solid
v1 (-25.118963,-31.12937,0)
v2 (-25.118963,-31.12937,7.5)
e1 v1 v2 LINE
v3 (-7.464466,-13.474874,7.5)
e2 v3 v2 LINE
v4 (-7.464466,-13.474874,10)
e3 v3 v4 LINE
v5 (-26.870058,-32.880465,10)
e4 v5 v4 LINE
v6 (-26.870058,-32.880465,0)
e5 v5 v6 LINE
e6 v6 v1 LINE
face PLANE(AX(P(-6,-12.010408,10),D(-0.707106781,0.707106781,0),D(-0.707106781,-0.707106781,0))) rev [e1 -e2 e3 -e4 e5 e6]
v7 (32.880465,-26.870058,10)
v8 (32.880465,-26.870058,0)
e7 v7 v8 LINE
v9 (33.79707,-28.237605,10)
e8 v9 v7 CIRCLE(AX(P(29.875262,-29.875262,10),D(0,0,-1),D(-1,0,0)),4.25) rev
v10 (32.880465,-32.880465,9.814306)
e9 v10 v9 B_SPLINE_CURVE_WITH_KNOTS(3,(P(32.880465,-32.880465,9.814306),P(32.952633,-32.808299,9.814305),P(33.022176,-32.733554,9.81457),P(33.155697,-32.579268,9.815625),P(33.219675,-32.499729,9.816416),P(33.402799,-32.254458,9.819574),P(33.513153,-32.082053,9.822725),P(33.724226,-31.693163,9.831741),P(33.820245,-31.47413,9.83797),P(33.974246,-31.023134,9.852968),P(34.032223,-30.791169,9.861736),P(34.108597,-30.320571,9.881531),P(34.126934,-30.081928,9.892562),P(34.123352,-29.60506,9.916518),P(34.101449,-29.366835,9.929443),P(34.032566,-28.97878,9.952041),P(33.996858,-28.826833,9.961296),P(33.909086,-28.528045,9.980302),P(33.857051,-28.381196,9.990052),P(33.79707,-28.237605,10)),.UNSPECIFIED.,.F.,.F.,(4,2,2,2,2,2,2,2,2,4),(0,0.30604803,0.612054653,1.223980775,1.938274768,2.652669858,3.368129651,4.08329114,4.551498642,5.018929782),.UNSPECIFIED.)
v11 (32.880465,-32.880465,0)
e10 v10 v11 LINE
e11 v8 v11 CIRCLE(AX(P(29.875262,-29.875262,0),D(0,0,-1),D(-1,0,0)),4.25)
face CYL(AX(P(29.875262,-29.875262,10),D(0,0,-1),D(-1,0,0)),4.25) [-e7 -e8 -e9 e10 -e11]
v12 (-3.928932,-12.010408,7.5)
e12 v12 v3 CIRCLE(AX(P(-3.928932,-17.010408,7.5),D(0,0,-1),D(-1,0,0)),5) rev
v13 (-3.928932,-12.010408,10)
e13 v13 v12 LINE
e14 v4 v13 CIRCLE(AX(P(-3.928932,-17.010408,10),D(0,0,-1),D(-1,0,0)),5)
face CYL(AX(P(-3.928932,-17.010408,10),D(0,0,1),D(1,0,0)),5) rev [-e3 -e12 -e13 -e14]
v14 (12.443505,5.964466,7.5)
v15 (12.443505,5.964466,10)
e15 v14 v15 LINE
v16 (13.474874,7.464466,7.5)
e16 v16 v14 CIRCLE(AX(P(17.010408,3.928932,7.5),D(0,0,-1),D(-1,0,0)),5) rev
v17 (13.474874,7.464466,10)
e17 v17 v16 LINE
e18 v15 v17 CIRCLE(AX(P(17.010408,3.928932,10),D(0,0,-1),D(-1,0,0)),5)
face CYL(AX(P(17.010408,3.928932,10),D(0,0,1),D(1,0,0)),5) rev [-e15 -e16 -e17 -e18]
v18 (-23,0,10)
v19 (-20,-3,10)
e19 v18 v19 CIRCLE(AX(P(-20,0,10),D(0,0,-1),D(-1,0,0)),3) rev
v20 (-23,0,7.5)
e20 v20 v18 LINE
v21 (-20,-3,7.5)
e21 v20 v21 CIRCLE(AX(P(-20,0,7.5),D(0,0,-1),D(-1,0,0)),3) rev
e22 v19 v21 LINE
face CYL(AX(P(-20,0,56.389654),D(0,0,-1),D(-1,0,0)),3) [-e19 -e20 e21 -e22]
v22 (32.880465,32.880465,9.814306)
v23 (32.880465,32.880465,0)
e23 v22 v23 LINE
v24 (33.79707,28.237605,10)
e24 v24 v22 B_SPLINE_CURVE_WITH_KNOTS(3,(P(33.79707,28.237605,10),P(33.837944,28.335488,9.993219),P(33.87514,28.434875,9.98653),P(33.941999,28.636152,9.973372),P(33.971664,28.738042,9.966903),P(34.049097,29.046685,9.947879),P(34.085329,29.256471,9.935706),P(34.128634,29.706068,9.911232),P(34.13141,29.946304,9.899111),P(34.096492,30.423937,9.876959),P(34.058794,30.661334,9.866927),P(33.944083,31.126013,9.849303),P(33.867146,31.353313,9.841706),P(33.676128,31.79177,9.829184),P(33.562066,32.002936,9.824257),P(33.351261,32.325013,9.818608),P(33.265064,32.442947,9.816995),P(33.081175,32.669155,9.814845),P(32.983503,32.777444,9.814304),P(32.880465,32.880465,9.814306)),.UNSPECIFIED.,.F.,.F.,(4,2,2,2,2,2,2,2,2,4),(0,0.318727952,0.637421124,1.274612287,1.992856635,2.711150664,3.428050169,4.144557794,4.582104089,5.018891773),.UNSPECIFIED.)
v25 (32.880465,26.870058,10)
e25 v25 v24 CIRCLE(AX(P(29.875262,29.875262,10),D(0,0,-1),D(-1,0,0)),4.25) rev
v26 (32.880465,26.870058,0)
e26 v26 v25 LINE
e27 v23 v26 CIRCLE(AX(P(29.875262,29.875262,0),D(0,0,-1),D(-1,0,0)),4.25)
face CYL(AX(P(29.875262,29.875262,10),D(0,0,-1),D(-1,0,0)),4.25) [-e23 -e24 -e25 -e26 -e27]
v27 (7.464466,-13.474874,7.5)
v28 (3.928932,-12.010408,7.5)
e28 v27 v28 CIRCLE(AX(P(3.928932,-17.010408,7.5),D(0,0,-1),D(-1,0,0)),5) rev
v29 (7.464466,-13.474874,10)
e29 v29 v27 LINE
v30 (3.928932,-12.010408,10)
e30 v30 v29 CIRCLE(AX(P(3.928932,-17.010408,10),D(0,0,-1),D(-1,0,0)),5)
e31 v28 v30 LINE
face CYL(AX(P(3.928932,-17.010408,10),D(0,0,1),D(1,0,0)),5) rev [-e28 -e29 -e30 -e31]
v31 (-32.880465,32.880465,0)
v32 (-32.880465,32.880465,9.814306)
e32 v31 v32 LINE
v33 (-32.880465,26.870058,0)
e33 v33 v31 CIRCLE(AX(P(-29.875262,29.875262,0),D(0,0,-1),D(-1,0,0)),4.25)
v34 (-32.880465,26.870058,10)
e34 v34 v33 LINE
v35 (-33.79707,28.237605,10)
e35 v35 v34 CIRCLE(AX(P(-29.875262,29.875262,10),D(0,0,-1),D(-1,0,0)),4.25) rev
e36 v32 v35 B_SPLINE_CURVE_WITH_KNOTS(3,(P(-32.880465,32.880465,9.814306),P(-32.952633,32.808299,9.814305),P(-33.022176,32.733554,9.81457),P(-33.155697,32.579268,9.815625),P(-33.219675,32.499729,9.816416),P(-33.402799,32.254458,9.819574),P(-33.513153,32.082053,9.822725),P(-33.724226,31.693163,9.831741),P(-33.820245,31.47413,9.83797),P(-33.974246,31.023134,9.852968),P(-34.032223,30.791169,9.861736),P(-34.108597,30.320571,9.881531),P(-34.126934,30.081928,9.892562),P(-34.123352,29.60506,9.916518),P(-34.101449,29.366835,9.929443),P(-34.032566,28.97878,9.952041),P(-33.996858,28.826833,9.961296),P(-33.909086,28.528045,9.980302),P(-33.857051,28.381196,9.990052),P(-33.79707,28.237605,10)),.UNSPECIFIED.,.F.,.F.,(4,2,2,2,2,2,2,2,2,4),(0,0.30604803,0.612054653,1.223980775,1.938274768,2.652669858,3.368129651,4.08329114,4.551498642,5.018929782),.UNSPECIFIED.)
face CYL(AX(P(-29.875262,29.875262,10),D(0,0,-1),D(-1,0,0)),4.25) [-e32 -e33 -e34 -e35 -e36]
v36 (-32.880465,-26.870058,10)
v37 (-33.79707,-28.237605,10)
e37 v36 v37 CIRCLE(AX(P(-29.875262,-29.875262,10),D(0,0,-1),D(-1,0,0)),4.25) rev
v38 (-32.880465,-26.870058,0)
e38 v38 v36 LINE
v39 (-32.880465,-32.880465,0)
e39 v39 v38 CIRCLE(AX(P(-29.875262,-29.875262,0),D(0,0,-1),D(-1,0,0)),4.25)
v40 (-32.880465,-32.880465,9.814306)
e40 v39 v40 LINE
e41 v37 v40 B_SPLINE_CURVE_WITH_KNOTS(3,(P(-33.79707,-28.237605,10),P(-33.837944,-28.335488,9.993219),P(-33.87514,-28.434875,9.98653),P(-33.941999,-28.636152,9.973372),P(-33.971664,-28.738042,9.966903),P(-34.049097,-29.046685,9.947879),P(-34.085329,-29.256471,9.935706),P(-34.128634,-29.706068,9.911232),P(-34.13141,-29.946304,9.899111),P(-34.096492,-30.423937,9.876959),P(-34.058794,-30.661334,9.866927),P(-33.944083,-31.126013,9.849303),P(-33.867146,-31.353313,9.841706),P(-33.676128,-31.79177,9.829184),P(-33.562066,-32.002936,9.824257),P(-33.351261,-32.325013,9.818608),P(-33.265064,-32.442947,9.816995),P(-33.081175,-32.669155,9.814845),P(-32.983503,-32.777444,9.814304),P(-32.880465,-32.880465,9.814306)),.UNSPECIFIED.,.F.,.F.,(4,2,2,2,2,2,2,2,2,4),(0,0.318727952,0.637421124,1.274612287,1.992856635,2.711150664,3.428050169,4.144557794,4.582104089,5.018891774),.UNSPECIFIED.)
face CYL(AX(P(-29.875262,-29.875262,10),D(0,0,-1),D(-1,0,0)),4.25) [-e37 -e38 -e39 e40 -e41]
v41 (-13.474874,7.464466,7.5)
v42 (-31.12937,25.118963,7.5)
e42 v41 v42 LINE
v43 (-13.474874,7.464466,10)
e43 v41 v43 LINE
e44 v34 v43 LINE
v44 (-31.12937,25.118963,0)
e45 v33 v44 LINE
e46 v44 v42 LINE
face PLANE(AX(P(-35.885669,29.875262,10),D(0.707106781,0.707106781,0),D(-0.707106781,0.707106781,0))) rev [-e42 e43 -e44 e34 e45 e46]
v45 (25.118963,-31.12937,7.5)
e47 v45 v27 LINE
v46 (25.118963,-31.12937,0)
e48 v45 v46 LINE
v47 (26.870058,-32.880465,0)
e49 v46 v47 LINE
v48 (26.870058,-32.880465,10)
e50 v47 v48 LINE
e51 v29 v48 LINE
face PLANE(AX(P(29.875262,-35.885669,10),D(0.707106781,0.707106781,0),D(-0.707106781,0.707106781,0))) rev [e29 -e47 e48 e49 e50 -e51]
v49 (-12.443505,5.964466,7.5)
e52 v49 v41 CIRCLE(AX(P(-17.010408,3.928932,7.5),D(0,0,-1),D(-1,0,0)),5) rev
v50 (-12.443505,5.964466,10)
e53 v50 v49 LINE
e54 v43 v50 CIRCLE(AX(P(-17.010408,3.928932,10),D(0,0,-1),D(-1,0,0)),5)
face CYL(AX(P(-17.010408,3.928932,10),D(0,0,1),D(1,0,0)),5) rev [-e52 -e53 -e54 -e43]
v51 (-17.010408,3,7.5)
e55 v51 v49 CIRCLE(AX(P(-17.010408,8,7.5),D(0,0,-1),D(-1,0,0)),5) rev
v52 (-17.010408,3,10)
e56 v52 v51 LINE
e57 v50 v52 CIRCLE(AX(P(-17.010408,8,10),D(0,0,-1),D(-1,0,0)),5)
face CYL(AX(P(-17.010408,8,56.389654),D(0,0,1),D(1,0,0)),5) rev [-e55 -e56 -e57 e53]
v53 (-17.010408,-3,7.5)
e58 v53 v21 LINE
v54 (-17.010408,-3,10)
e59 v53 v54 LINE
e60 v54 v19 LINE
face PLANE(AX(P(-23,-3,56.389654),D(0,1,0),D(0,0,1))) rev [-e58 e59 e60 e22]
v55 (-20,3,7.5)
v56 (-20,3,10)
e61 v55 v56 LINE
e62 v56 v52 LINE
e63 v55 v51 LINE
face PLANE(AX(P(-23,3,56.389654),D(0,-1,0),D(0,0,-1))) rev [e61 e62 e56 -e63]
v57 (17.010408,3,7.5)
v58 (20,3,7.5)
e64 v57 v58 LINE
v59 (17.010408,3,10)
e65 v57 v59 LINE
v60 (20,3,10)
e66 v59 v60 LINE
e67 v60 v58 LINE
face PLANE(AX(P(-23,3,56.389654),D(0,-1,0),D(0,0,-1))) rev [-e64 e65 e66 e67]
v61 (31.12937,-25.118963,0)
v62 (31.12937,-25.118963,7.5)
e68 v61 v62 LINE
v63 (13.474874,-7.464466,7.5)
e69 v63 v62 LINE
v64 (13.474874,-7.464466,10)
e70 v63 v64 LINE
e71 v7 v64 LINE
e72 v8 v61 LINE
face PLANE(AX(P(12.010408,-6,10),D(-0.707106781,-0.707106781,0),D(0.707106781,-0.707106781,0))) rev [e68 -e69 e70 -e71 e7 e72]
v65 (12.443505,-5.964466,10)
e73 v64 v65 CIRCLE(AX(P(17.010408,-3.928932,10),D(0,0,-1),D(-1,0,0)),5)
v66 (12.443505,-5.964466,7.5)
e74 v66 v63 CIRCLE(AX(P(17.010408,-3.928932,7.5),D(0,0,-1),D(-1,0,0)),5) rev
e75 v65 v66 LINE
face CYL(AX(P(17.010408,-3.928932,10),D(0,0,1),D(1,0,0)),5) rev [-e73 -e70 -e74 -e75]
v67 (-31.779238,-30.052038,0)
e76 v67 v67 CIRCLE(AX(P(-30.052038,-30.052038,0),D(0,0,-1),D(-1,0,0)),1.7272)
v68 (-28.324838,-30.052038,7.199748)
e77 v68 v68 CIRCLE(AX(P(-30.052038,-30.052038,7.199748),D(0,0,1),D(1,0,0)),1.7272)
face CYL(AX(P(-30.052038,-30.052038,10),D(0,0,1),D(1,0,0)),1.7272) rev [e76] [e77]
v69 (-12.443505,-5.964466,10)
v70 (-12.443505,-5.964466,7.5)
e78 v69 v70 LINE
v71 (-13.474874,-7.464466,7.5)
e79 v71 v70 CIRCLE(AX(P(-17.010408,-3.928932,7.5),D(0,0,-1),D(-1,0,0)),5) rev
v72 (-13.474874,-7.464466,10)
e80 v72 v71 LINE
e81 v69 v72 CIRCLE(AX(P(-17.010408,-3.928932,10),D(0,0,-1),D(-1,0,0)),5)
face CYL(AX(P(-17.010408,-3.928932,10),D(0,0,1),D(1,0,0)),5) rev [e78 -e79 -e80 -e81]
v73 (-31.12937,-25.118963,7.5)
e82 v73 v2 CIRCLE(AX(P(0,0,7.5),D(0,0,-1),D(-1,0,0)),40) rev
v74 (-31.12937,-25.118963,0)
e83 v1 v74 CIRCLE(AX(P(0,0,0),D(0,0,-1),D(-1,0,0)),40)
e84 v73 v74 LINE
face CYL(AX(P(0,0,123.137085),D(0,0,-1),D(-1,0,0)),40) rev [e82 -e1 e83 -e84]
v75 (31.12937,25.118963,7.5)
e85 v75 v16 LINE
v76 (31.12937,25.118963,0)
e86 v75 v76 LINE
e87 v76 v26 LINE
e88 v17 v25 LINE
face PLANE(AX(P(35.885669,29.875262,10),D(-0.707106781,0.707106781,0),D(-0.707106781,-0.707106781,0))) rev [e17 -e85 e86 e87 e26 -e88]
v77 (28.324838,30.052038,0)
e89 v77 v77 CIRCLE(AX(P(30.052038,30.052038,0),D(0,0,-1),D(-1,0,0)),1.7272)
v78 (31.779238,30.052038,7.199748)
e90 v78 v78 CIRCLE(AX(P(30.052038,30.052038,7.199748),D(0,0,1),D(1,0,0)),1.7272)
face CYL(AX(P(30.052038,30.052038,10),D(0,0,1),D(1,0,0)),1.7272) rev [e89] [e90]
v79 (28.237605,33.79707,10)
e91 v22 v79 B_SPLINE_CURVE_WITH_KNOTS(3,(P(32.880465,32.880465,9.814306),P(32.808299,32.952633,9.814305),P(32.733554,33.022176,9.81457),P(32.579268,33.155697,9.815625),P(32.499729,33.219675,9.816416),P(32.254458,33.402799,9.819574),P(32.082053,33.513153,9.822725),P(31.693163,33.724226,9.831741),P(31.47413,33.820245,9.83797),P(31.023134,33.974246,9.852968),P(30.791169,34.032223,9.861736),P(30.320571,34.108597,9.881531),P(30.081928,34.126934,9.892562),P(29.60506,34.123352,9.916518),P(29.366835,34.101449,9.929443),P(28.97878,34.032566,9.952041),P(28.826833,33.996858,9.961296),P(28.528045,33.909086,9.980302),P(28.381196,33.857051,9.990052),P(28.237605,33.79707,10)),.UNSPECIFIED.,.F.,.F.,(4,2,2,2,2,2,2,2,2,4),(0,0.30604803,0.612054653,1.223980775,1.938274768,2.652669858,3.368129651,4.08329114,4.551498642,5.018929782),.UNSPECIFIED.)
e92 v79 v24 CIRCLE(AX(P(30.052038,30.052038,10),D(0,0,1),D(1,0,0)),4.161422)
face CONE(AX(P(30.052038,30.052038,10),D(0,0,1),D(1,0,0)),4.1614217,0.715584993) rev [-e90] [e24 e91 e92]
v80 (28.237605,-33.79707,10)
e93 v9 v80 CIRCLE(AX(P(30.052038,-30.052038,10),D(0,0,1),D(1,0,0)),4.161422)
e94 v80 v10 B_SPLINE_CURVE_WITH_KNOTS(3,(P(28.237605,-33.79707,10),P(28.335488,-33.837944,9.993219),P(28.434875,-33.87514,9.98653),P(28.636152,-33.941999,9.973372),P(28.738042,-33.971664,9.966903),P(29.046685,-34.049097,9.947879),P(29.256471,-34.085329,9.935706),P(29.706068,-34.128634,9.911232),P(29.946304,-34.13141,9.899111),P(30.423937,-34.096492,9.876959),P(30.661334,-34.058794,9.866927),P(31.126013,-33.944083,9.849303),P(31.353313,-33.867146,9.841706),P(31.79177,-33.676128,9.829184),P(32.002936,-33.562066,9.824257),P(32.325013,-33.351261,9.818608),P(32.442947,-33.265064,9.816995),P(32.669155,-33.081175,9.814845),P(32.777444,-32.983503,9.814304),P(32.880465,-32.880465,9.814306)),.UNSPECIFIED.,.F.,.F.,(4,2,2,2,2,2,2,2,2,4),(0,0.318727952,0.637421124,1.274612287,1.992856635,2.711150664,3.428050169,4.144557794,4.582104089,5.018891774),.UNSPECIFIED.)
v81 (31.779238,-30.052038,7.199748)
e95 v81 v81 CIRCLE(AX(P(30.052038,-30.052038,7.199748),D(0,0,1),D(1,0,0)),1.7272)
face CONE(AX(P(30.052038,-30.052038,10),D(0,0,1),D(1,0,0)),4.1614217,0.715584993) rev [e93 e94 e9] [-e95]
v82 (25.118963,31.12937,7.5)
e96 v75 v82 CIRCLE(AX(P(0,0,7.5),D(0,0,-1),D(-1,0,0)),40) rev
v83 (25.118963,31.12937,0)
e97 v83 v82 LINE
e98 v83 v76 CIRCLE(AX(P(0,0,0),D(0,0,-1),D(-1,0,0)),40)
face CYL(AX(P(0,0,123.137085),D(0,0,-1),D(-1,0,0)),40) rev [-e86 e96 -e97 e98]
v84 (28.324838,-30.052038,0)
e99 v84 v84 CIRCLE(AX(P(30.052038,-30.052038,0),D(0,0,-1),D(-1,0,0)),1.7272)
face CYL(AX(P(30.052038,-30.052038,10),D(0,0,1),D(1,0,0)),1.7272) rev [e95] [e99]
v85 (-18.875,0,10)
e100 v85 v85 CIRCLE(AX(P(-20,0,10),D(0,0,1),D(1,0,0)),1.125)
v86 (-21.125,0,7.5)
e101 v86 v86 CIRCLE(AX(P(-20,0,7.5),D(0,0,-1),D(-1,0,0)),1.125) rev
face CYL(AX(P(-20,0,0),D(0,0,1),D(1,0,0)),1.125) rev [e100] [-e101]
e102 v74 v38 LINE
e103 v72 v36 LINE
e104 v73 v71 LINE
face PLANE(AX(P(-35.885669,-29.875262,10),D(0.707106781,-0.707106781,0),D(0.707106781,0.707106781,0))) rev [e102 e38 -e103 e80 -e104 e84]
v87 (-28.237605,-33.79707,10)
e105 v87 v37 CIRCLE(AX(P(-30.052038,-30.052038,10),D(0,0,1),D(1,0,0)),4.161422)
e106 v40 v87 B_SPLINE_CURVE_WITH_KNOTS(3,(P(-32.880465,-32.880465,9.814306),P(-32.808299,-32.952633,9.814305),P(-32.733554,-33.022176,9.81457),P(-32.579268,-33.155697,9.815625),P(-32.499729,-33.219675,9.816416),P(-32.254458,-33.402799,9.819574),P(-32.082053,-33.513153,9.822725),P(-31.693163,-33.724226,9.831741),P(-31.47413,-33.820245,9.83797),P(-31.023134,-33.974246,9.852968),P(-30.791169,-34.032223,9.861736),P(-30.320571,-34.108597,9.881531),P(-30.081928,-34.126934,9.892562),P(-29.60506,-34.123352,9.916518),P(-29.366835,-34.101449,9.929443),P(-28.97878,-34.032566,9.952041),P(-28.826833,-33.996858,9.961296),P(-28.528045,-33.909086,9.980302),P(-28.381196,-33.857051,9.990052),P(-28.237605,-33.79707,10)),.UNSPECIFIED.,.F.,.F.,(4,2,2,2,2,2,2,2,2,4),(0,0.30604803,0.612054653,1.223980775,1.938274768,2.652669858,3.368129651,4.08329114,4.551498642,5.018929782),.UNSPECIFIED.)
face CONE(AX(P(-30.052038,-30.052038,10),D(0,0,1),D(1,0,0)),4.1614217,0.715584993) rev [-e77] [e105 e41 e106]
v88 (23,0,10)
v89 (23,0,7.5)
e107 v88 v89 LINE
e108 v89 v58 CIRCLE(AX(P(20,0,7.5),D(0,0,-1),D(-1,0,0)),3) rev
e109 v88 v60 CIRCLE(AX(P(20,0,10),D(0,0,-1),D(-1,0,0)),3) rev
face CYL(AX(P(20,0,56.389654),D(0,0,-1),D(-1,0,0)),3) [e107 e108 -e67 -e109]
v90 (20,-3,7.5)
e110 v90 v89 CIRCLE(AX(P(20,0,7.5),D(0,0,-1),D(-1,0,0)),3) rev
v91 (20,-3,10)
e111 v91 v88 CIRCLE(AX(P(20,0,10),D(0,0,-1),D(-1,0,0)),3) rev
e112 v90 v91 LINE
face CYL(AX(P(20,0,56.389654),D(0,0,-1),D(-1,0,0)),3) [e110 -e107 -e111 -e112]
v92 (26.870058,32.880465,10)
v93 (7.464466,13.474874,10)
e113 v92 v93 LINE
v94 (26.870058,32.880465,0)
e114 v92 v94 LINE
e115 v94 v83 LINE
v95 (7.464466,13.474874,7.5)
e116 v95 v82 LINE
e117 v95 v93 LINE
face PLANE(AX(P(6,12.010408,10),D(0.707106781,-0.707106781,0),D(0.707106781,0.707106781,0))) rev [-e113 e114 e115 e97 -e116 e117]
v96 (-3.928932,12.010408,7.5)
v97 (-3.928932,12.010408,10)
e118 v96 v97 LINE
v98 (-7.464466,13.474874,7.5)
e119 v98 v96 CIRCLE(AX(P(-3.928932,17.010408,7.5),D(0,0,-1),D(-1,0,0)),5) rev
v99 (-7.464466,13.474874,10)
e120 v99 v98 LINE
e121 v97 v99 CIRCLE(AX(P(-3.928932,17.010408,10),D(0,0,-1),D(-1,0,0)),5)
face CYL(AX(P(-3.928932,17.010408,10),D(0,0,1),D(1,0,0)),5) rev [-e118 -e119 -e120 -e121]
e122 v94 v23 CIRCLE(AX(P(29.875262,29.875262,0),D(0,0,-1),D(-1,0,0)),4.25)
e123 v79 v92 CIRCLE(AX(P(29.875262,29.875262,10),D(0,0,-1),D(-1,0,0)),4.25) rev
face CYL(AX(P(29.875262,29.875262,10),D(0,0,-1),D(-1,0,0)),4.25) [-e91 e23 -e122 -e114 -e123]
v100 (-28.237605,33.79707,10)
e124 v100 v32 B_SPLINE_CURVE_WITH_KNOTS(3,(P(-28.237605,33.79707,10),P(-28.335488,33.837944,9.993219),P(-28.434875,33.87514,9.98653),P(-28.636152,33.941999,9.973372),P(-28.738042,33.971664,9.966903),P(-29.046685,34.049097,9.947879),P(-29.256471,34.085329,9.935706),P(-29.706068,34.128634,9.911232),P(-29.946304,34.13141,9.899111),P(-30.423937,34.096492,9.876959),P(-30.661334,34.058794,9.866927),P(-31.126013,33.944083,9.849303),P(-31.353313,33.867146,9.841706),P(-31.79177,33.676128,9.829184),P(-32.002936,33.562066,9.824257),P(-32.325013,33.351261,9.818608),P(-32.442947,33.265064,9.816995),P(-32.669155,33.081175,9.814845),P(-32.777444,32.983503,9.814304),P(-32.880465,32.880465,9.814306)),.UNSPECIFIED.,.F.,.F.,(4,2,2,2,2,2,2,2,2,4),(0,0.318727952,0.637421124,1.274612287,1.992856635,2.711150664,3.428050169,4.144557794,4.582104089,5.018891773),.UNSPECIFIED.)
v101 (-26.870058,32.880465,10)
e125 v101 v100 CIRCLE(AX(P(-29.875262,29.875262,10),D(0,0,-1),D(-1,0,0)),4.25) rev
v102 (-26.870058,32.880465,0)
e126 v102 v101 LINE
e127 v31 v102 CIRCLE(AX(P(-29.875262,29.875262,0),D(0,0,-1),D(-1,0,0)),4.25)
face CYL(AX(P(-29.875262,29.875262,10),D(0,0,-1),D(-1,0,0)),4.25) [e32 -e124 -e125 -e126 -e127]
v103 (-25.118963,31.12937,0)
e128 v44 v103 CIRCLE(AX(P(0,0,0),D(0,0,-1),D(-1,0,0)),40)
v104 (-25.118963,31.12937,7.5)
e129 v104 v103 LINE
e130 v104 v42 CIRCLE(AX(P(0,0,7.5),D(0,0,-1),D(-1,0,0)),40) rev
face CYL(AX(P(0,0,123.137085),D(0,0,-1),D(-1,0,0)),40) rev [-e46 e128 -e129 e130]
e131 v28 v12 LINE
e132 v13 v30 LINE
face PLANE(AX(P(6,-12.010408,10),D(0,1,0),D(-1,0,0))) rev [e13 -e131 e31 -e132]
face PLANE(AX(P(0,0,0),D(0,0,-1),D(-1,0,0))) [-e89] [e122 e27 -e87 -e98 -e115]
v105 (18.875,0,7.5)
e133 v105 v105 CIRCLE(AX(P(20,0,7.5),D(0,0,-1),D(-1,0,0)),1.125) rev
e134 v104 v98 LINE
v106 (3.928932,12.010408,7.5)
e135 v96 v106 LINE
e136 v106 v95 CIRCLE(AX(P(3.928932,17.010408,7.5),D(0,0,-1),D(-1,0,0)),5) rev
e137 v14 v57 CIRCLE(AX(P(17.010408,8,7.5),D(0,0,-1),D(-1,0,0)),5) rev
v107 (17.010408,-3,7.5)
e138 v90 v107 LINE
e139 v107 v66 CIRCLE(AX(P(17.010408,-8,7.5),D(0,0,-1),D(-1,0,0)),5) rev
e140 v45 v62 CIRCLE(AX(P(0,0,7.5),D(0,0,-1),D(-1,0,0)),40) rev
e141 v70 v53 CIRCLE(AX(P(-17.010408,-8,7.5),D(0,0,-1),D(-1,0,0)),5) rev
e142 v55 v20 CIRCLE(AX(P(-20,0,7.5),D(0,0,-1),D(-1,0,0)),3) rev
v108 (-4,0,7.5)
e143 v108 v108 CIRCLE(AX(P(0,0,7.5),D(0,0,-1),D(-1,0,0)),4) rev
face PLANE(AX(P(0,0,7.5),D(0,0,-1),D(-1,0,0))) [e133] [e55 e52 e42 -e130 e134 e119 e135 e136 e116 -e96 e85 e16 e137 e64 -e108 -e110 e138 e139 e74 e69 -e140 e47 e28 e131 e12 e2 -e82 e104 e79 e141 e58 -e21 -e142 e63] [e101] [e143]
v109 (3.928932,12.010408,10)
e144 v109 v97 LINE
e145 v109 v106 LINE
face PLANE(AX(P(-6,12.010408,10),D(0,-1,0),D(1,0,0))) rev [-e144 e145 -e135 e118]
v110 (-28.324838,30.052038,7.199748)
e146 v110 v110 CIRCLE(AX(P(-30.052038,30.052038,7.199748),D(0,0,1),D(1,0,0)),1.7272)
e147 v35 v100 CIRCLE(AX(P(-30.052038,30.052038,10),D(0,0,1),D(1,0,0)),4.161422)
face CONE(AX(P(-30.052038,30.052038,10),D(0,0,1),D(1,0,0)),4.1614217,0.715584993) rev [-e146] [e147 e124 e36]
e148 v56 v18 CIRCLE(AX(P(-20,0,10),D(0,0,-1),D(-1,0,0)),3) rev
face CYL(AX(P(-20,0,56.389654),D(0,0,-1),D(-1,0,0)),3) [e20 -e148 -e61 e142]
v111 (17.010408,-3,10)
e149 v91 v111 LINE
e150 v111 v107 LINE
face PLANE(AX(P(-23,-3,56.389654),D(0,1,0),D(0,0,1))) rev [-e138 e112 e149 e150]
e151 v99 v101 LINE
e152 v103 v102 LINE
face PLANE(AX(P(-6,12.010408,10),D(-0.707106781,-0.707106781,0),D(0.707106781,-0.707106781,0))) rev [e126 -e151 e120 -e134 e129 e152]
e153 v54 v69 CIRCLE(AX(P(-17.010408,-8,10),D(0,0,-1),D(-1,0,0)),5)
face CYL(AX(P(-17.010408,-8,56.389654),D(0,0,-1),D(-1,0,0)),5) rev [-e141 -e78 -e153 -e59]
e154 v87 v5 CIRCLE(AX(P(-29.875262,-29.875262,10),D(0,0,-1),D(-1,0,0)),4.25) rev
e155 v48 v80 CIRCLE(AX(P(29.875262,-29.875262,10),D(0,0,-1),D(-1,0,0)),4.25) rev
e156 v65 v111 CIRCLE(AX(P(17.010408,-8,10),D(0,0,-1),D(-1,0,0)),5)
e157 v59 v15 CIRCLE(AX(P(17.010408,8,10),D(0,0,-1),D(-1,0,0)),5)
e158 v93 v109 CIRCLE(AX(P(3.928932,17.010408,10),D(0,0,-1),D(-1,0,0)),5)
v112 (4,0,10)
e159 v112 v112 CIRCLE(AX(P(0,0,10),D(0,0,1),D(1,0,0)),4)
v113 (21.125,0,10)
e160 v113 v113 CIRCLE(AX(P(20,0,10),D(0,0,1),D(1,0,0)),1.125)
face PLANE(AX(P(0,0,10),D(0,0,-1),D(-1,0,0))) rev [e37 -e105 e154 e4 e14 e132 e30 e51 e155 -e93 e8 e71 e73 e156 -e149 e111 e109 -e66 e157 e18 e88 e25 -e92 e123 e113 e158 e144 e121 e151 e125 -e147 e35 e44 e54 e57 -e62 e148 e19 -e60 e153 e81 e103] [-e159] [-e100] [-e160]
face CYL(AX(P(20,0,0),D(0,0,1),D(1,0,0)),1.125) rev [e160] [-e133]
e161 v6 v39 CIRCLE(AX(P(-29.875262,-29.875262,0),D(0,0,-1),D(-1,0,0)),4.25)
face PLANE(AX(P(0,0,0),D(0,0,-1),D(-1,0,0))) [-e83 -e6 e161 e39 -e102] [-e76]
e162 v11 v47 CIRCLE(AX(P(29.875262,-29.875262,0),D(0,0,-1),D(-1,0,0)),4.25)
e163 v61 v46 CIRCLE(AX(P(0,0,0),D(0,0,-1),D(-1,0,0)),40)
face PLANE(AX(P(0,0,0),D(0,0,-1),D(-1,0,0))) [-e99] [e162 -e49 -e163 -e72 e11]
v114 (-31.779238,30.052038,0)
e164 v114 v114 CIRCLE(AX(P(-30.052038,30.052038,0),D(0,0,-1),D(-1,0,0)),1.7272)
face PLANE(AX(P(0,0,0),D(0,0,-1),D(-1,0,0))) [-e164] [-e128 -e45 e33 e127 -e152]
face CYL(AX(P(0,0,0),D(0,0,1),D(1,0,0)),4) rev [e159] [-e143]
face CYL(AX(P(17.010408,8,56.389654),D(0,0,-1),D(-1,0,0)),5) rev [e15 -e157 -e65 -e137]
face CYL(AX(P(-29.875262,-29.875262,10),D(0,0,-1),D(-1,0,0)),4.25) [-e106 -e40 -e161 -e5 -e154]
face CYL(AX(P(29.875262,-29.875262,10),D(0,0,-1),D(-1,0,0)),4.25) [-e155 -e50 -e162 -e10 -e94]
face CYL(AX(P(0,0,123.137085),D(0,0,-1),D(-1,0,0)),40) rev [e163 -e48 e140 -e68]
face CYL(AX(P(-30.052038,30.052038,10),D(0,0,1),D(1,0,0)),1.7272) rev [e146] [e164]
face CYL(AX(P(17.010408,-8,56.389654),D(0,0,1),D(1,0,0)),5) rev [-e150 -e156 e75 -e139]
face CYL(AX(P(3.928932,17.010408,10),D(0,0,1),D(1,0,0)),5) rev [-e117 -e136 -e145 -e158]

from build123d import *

# Parameters (mm, degrees)
BOSS_EXTRUDE1_DEPTH                            = 10
SKETCH3_W                                      = 46
SKETCH3_H                                      = 6
BOSS_EXTRUDE2_DEPTH                            = 10
CSK_FOR_4_OVAL_HEAD_MACHINE_SCREW1_D           = 3.4544
CSK_FOR_4_OVAL_HEAD_MACHINE_SCREW1_DEPTH       = 25
CSK_FOR_4_OVAL_HEAD_MACHINE_SCREW1_CSINK_D     = 8.3228434
CSK_FOR_4_OVAL_HEAD_MACHINE_SCREW1_CSINK_ANGLE = 82
CSK_FOR_4_OVAL_HEAD_MACHINE_SCREW1_TIP         = 1.037806461
SKETCH7_R                                      = 1.125
CUT_EXTRUDE1_DEPTH                             = 52.725839771
SKETCH8_R                                      = 4
CUT_EXTRUDE2_DEPTH                             = 52.725839771
FILLET1_R                                      = 4.25
FILLET2_R                                      = 3
FILLET3_R                                      = 5
SKETCH9_R                                      = 40
CUT_EXTRUDE3_DEPTH                             = 7.5


# Some blends are built 0.0001 mm under size
with BuildPart() as part:
    # Sketch2 → Boss-Extrude1 (new body)
    with BuildSketch(Plane.XY):
        Polygon((-6, 12.01040764), (-29.875261505, 35.885669145), (-35.885669145, 29.875261505), (-12.01040764, 6), (-12.01040764, -6), (-35.885669145, -29.875261505), (-29.875261505, -35.885669145), (-6, -12.01040764), (6, -12.01040764), (29.875261505, -35.885669145), (35.885669145, -29.875261505), (12.01040764, -6), (12.01040764, 6), (35.885669145, 29.875261505), (29.875261505, 35.885669145), (6, 12.01040764), align=None)
    extrude(amount=BOSS_EXTRUDE1_DEPTH)

    # Sketch3 → Boss-Extrude2 (add)
    with BuildSketch(Plane.XY):
        Rectangle(SKETCH3_W, SKETCH3_H)
    extrude(amount=BOSS_EXTRUDE2_DEPTH)

    # CSK for #4 Oval Head Machine Screw1
    with Locations(Plane.XY.offset(10)):
        with Locations((-30.0520382, 30.0520382), (30.0520382, 30.0520382), (30.0520382, -30.0520382), (-30.0520382, -30.0520382)):
            CounterSinkHole(CSK_FOR_4_OVAL_HEAD_MACHINE_SCREW1_D / 2, CSK_FOR_4_OVAL_HEAD_MACHINE_SCREW1_CSINK_D / 2, depth=CSK_FOR_4_OVAL_HEAD_MACHINE_SCREW1_DEPTH, counter_sink_angle=CSK_FOR_4_OVAL_HEAD_MACHINE_SCREW1_CSINK_ANGLE)
            with Locations((0, 0, -(CSK_FOR_4_OVAL_HEAD_MACHINE_SCREW1_DEPTH + CSK_FOR_4_OVAL_HEAD_MACHINE_SCREW1_TIP / 2))):  # 118° drill point
                Cone(0, CSK_FOR_4_OVAL_HEAD_MACHINE_SCREW1_D / 2, CSK_FOR_4_OVAL_HEAD_MACHINE_SCREW1_TIP, mode=Mode.SUBTRACT)

    # Sketch7 → Cut-Extrude1 (cut, through all)
    with BuildSketch(Plane.XY.offset(10)):
        with Locations((20, 0)):
            Circle(SKETCH7_R)
        with Locations((-20, 0)):
            Circle(SKETCH7_R)
    extrude(amount=-CUT_EXTRUDE1_DEPTH, mode=Mode.SUBTRACT)

    # Sketch8 → Cut-Extrude2 (cut, through all)
    with BuildSketch(Plane.XY.offset(10)):
        Circle(SKETCH8_R)
    extrude(amount=-CUT_EXTRUDE2_DEPTH, mode=Mode.SUBTRACT)

    # Fillet1
    # the kernel refuses this fillet: 4.25 mm, written as the material it takes off along each edge
    with BuildSketch(Plane(origin=(35.885669145, -29.875261505, -10.625), x_dir=(-0.7071067811865225, 0.7071067811865727, 0), z_dir=(0, 0, 1)), Plane(origin=(29.875261505, -35.885669145, -10.625), x_dir=(0.7071067811865693, 0.7071067811865258, 0), z_dir=(0, 0, 1)), Plane(origin=(29.875261505, 35.885669145, -10.625), x_dir=(-0.7071067811865508, -0.7071067811865441, 0), z_dir=(0, 0, 1)), Plane(origin=(35.885669145, 29.875261505, -10.625), x_dir=(-0.7071067811889081, 0.7071067811841868, 0), z_dir=(0, 0, 1))) as fillet1_piece_1:
        with BuildLine():
            CenterArc((FILLET1_R, FILLET1_R), FILLET1_R, 180, 90)
            Line((0, FILLET1_R), (0, 0))
            Line((0, 0), (FILLET1_R, 0))
        make_face()
    extrude(amount=31.25, mode=Mode.SUBTRACT)
    with BuildSketch(Plane(origin=(-29.875261505, 35.885669145, -10.625), x_dir=(0.7071067811862382, -0.7071067811868568, 0), z_dir=(0, 0, 1)), Plane(origin=(-35.885669145, 29.875261505, -10.625), x_dir=(0.7071067811865512, 0.7071067811865438, 0), z_dir=(0, 0, 1)), Plane(origin=(-35.885669145, -29.875261505, -10.625), x_dir=(0.7071067811865503, 0.7071067811865446, 0), z_dir=(0, 0, 1)), Plane(origin=(-29.875261505, -35.885669145, -10.625), x_dir=(-0.7071067811865447, 0.7071067811865505, 0), z_dir=(0, 0, 1))) as fillet1_piece_2:
        with BuildLine():
            CenterArc((FILLET1_R, -FILLET1_R), FILLET1_R, 90, 90)
            Line((0, -FILLET1_R), (0, 0))
            Line((0, 0), (FILLET1_R, 0))
        make_face()
    extrude(amount=31.25, mode=Mode.SUBTRACT)

    # Fillet2
    fillet2_edges = [part.edges().sort_by_distance(p)[0] for p in [
        (23, 3, 5),
        (23, -3, 5),
        (-23, 3, 5),
        (-23, -3, 5),
    ]]
    fillet(fillet2_edges, radius=FILLET2_R - 0.0001)  # a hair under: the kernel refuses the full size

    # Fillet3
    # the kernel refuses this fillet: 5 mm, written as the material it adds along each edge
    with BuildSketch(Plane(origin=(-6, 12.01040764, 0), x_dir=(1, 0, 0), z_dir=(0, 0, 1)), Plane(origin=(6, 12.01040764, 0), x_dir=(0.7071067811865509, 0.707106781186544, 0), z_dir=(0, 0, 1)), Plane(origin=(-12.01040764, 6, 0), x_dir=(-0.7071067811865444, 0.7071067811865508, 0), z_dir=(0, 0, 1)), Plane(origin=(12.01040764, 6, 0), x_dir=(0, -1, 0), z_dir=(0, 0, 1))) as fillet3_piece_1:
        with BuildLine():
            CenterArc((FILLET3_R * 0.414213562373, FILLET3_R), FILLET3_R, 225, 45)
            Line((-FILLET3_R * 0.292893218814, FILLET3_R * 0.292893218814), (0, 0))
            Line((0, 0), (FILLET3_R * 0.414213562373, 0))
        make_face()
    extrude(amount=10)
    with BuildSketch(Plane(origin=(-12.01040764, 3, 0), x_dir=(0, 1, 0), z_dir=(0, 0, 1)), Plane(origin=(-12.01040764, -3, 10), x_dir=(0, -1, 0), z_dir=(0, 0, -1))) as fillet3_piece_2:
        with BuildLine():
            CenterArc((FILLET3_R, FILLET3_R), FILLET3_R, 180, 90)
            Line((0, FILLET3_R), (0, 0))
            Line((0, 0), (FILLET3_R, 0))
        make_face()
    extrude(amount=10)
    with BuildSketch(Plane(origin=(-12.01040764, -6, 0), x_dir=(-0.7071067811865506, -0.7071067811865446, 0), z_dir=(0, 0, 1)), Plane(origin=(-6, -12.01040764, 0), x_dir=(1, 0, 0), z_dir=(0, 0, 1)), Plane(origin=(6, -12.01040764, 0), x_dir=(0.7071067811861392, -0.7071067811869558, 0), z_dir=(0, 0, 1)), Plane(origin=(12.01040764, -6, 0), x_dir=(0, 1, 0), z_dir=(0, 0, 1))) as fillet3_piece_3:
        with BuildLine():
            CenterArc((FILLET3_R * 0.414213562373, -FILLET3_R), FILLET3_R, 90, 45)
            Line((-FILLET3_R * 0.292893218813, -FILLET3_R * 0.292893218813), (0, 0))
            Line((0, 0), (FILLET3_R * 0.414213562373, 0))
        make_face()
    extrude(amount=10)
    with BuildSketch(Plane(origin=(12.01040764, -3, 0), x_dir=(1, 0, 0), z_dir=(0, 0, 1)), Plane(origin=(12.01040764, 3, 10), x_dir=(1, 0, 0), z_dir=(0, 0, -1))) as fillet3_piece_4:
        with BuildLine():
            CenterArc((FILLET3_R, -FILLET3_R), FILLET3_R, 90, 90)
            Line((0, -FILLET3_R), (0, 0))
            Line((0, 0), (FILLET3_R, 0))
        make_face()
    extrude(amount=10)

    # Sketch9 → Cut-Extrude3 (cut)
    with BuildSketch(Plane(origin=(0, 0, 0), x_dir=(-1, 0, 0), z_dir=(0, 0, -1))):
        Circle(SKETCH9_R)
    extrude(amount=-CUT_EXTRUDE3_DEPTH, mode=Mode.SUBTRACT)


solid = part.part
